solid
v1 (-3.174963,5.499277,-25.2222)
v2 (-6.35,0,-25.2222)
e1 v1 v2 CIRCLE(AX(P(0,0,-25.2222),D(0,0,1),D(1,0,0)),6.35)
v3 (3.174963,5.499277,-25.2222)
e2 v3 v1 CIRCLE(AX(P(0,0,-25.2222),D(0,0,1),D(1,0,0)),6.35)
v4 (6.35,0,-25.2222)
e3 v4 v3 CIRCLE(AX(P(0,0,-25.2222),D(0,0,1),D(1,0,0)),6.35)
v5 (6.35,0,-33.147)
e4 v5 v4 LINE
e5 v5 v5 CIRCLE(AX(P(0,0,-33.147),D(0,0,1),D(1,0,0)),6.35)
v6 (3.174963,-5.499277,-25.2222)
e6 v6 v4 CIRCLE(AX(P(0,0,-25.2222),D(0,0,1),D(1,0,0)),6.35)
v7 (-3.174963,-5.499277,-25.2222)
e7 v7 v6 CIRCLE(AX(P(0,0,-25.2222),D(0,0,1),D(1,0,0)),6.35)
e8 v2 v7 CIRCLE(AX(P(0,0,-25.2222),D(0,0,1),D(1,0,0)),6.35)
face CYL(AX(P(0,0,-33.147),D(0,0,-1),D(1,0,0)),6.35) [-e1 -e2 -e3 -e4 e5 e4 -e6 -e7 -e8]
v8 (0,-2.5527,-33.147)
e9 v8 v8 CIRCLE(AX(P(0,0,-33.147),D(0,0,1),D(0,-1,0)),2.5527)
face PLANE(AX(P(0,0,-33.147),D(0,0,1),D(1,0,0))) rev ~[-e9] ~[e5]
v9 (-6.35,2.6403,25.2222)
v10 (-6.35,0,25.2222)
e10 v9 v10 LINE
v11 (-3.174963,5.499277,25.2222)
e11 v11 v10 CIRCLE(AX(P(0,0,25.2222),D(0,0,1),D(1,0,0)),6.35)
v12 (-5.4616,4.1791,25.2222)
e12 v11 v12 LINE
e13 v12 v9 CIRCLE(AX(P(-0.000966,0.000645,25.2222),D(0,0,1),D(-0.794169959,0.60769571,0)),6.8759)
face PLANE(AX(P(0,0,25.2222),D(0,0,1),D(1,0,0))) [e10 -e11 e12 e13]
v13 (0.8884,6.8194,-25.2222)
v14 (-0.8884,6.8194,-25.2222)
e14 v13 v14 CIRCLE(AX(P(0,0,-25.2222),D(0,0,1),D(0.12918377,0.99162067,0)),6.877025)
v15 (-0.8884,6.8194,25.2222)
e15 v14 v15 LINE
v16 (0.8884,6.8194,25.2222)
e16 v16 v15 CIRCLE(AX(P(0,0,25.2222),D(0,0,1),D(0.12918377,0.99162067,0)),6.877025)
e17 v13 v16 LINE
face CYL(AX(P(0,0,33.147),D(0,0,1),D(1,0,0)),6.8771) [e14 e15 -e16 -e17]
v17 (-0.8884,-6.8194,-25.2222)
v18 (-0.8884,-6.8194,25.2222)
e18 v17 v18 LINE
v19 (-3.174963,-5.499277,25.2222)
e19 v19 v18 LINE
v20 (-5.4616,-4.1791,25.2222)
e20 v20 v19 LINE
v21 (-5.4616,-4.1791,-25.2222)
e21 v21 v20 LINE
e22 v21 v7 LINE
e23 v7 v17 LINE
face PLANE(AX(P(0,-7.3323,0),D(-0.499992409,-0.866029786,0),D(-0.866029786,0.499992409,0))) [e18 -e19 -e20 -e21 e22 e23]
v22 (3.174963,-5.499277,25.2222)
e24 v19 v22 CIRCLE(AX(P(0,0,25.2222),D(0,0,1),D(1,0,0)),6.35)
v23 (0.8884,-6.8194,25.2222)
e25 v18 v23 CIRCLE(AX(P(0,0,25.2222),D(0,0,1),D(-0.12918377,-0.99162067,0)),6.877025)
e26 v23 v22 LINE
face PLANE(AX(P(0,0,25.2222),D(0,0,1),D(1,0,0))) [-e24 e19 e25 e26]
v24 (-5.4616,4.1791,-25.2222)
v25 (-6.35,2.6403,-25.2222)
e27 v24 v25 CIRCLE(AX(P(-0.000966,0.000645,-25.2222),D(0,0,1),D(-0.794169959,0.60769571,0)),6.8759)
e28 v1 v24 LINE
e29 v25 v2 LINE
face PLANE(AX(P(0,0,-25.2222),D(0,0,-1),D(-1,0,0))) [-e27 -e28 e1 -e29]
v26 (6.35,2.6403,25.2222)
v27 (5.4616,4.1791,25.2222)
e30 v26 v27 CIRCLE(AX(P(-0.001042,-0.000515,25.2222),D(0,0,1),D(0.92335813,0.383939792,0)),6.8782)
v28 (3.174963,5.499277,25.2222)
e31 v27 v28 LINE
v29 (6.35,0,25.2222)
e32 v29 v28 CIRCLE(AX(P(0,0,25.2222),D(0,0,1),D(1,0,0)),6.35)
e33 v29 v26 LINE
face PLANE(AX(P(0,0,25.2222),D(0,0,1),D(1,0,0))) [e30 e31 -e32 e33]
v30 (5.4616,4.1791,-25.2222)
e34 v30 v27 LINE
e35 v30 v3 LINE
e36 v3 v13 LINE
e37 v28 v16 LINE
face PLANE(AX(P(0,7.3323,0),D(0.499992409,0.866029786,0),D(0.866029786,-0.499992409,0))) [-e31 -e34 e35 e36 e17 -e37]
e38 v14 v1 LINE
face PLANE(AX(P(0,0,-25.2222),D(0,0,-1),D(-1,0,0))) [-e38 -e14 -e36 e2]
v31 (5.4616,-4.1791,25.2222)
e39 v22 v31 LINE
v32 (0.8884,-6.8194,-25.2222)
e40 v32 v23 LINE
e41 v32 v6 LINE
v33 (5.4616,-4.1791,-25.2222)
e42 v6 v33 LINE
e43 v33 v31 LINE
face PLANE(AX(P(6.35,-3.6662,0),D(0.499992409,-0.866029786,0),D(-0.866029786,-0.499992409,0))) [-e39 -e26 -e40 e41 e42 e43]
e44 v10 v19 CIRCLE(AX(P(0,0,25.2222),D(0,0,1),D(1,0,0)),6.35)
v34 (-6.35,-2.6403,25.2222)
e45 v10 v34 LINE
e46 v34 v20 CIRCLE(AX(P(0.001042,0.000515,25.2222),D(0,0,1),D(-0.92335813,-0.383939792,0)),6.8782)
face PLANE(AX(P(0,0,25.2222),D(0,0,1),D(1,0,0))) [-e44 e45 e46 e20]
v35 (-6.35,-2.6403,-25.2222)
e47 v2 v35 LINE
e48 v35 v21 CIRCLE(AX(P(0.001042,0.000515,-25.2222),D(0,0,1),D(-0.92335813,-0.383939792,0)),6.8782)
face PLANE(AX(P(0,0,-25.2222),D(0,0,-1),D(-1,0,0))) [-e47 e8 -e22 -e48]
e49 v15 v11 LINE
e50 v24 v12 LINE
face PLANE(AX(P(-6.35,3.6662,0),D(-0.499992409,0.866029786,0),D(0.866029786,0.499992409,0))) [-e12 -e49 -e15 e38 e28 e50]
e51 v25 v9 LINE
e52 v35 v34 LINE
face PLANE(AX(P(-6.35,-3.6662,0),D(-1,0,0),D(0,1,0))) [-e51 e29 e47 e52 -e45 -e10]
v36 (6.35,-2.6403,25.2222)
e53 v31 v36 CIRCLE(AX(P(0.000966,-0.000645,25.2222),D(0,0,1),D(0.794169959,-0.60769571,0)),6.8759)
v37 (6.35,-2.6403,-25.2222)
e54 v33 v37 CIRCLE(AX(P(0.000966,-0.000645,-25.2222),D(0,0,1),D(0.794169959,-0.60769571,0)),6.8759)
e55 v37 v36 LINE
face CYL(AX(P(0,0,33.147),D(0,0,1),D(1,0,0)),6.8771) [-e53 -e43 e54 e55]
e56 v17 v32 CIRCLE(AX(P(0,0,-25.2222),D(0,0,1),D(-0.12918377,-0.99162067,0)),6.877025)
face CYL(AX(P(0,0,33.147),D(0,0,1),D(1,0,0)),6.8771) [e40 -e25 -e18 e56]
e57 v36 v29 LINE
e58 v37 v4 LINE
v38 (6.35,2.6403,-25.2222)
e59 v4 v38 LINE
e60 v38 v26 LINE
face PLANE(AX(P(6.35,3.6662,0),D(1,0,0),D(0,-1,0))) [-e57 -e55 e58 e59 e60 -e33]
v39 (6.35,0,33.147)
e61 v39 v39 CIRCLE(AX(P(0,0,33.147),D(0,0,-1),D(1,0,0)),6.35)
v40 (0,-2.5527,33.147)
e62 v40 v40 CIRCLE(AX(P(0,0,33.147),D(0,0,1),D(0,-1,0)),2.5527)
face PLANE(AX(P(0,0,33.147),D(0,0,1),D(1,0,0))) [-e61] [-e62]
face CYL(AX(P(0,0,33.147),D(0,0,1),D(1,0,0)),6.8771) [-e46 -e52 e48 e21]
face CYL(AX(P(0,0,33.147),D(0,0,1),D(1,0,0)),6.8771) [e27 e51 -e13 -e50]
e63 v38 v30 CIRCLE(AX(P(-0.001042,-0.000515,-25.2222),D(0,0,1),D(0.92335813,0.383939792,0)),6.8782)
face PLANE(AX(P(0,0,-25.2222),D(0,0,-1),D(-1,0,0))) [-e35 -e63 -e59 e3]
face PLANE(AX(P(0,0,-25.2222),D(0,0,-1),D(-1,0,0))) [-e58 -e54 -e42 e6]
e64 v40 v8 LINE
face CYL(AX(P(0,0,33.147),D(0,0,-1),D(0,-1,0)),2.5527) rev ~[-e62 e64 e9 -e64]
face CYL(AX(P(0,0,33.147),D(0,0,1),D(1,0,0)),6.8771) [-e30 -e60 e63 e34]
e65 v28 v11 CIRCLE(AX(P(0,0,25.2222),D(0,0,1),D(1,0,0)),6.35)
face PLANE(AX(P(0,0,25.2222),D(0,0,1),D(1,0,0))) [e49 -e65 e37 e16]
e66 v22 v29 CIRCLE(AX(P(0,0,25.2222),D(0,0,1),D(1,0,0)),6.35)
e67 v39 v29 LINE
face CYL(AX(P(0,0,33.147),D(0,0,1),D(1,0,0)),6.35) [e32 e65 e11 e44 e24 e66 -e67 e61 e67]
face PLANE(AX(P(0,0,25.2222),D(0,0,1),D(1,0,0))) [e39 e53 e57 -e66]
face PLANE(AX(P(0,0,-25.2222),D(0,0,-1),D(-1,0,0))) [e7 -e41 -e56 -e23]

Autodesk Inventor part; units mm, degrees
ref_plane "YZ Plane" through (0, 0, 0) normal (1, 0, 0) x (0, 1, 0)
ref_plane "XZ Plane" through (0, 0, 0) normal (0, 1, 0) x (-1, 0, 0)
ref_plane "XY Plane" through (0, 0, 0) normal (0, 0, 1) x (1, 0, 0)
sketch "Sketch1" plane through (0, 0, 0) normal (0, 0, 1) x (1, 0, 0)
  line L0 (-6.35, -3.6662) -> (-6.35, 3.6662)
  line L1 (-6.35, 3.6662) -> (0, 7.3323)
  line L2 (0, 7.3323) -> (6.35, 3.6662)
  line L3 (6.35, 3.6662) -> (6.35, -3.6662)
  line L4 (6.35, -3.6662) -> (0, -7.3323)
  line L5 (0, -7.3323) -> (-6.35, -3.6662)
  point P0 (0, 0)
  point P1 (0, 0)
  dimension "Size" = 12.7
extrude "Extrusion1" add sketch "Sketch1" along normal mid plane 66.294
sketch "Sketch3" plane through (0, 0, 33.147) normal (0, 0, 1) x (1, 0, 0)
  line L0 (-6.35, 3.6662) -> (0, 7.3323) construction
  line L1 (0, 7.3323) -> (6.35, 3.6662) construction
  line L2 (6.35, 3.6662) -> (6.35, -3.6662) construction
  line L3 (6.35, -3.6662) -> (0, -7.3323) construction
  line L4 (0, -7.3323) -> (-6.35, -3.6662) construction
  line L5 (-6.35, -3.6662) -> (-6.35, 3.6662) construction
  point P0 (0, 0)
hole "Hole1" at (0, 0, 33.147) direction (0, 0, -1) diameter 5.1054 end through all
sketch "Sketch4" plane through (0, 0, 33.147) normal (0, 0, 1) x (1, 0, 0)
  circle A0 centre (0, 0) radius 2.5527 construction
  line L0 (-6.35, 3.6662) -> (0, 7.3323) construction
  line L1 (0, 7.3323) -> (6.35, 3.6662) construction
  line L2 (6.35, 3.6662) -> (6.35, -3.6662) construction
  line L3 (6.35, -3.6662) -> (0, -7.3323) construction
  line L4 (0, -7.3323) -> (-6.35, -3.6662) construction
  line L5 (-6.35, -3.6662) -> (-6.35, 3.6662) construction
  circle A1 centre (0, 0) radius 6.8771
  circle A2 centre (0, 0) radius 8.89
  dimension "thunder" = 13.7541
  dimension "d16" = 17.78
extrude "Extrusion3" cut sketch "Sketch4" against normal through all
sketch "Sketch5" plane through (0, 0, 33.147) normal (0, 0, 1) x (1, 0, 0)
  circle A0 centre (0, 0) radius 2.5527 projected
  circle A1 centre (0, 0) radius 6.35
  arc A2 (5.4616, -4.1791) -> (6.35, -2.6403) centre (0, 0) ccw projected
  line L0 (6.35, -2.6403) -> (6.35, 2.6403) projected
  arc A3 (6.35, 2.6403) -> (5.4616, 4.1791) centre (0, 0) ccw projected
  line L1 (5.4616, 4.1791) -> (0.8884, 6.8194) projected
  arc A4 (0.8884, 6.8194) -> (-0.8884, 6.8194) centre (0, 0) ccw projected
  line L2 (-0.8884, 6.8194) -> (-5.4616, 4.1791) projected
  arc A5 (-5.4616, 4.1791) -> (-6.35, 2.6403) centre (0, 0) ccw projected
  line L3 (-6.35, 2.6403) -> (-6.35, -2.6403) projected
  arc A6 (-6.35, -2.6403) -> (-5.4616, -4.1791) centre (0, 0) ccw projected
  line L4 (-5.4616, -4.1791) -> (-0.8884, -6.8194) projected
  arc A7 (-0.8884, -6.8194) -> (0.8884, -6.8194) centre (0, 0) ccw projected
  line L5 (0.8884, -6.8194) -> (5.4616, -4.1791) projected
  circle A8 centre (0, 0) radius 2.5527 projected
  point P0 (3.175, -5.4993)
  point P1 (-3.175, -5.4993)
  point P2 (-6.35, 0)
  point P3 (-3.175, 5.4993)
  point P4 (3.175, 5.4993)
  point P5 (6.35, 0)
  dimension "d21" = 12.7
extrude "Extrusion4" cut sketch "Sketch5" against normal blind 7.9248 contours A0 | L0 A2 L5 A1 | A1 L1 A3 L0 | A1 L2 A4 L1 | L5 A7 L4 A1 | A1 L3 A5 L2 | L4 A6 L3 A1
mirror "Mirror2" about plane through (0, 0, 0) normal (0, 0, 1) of "Extrusion4"
equation "\"bearing\" = 25.4"
properties part number "GP9-007" material "Aluminum 6061"
